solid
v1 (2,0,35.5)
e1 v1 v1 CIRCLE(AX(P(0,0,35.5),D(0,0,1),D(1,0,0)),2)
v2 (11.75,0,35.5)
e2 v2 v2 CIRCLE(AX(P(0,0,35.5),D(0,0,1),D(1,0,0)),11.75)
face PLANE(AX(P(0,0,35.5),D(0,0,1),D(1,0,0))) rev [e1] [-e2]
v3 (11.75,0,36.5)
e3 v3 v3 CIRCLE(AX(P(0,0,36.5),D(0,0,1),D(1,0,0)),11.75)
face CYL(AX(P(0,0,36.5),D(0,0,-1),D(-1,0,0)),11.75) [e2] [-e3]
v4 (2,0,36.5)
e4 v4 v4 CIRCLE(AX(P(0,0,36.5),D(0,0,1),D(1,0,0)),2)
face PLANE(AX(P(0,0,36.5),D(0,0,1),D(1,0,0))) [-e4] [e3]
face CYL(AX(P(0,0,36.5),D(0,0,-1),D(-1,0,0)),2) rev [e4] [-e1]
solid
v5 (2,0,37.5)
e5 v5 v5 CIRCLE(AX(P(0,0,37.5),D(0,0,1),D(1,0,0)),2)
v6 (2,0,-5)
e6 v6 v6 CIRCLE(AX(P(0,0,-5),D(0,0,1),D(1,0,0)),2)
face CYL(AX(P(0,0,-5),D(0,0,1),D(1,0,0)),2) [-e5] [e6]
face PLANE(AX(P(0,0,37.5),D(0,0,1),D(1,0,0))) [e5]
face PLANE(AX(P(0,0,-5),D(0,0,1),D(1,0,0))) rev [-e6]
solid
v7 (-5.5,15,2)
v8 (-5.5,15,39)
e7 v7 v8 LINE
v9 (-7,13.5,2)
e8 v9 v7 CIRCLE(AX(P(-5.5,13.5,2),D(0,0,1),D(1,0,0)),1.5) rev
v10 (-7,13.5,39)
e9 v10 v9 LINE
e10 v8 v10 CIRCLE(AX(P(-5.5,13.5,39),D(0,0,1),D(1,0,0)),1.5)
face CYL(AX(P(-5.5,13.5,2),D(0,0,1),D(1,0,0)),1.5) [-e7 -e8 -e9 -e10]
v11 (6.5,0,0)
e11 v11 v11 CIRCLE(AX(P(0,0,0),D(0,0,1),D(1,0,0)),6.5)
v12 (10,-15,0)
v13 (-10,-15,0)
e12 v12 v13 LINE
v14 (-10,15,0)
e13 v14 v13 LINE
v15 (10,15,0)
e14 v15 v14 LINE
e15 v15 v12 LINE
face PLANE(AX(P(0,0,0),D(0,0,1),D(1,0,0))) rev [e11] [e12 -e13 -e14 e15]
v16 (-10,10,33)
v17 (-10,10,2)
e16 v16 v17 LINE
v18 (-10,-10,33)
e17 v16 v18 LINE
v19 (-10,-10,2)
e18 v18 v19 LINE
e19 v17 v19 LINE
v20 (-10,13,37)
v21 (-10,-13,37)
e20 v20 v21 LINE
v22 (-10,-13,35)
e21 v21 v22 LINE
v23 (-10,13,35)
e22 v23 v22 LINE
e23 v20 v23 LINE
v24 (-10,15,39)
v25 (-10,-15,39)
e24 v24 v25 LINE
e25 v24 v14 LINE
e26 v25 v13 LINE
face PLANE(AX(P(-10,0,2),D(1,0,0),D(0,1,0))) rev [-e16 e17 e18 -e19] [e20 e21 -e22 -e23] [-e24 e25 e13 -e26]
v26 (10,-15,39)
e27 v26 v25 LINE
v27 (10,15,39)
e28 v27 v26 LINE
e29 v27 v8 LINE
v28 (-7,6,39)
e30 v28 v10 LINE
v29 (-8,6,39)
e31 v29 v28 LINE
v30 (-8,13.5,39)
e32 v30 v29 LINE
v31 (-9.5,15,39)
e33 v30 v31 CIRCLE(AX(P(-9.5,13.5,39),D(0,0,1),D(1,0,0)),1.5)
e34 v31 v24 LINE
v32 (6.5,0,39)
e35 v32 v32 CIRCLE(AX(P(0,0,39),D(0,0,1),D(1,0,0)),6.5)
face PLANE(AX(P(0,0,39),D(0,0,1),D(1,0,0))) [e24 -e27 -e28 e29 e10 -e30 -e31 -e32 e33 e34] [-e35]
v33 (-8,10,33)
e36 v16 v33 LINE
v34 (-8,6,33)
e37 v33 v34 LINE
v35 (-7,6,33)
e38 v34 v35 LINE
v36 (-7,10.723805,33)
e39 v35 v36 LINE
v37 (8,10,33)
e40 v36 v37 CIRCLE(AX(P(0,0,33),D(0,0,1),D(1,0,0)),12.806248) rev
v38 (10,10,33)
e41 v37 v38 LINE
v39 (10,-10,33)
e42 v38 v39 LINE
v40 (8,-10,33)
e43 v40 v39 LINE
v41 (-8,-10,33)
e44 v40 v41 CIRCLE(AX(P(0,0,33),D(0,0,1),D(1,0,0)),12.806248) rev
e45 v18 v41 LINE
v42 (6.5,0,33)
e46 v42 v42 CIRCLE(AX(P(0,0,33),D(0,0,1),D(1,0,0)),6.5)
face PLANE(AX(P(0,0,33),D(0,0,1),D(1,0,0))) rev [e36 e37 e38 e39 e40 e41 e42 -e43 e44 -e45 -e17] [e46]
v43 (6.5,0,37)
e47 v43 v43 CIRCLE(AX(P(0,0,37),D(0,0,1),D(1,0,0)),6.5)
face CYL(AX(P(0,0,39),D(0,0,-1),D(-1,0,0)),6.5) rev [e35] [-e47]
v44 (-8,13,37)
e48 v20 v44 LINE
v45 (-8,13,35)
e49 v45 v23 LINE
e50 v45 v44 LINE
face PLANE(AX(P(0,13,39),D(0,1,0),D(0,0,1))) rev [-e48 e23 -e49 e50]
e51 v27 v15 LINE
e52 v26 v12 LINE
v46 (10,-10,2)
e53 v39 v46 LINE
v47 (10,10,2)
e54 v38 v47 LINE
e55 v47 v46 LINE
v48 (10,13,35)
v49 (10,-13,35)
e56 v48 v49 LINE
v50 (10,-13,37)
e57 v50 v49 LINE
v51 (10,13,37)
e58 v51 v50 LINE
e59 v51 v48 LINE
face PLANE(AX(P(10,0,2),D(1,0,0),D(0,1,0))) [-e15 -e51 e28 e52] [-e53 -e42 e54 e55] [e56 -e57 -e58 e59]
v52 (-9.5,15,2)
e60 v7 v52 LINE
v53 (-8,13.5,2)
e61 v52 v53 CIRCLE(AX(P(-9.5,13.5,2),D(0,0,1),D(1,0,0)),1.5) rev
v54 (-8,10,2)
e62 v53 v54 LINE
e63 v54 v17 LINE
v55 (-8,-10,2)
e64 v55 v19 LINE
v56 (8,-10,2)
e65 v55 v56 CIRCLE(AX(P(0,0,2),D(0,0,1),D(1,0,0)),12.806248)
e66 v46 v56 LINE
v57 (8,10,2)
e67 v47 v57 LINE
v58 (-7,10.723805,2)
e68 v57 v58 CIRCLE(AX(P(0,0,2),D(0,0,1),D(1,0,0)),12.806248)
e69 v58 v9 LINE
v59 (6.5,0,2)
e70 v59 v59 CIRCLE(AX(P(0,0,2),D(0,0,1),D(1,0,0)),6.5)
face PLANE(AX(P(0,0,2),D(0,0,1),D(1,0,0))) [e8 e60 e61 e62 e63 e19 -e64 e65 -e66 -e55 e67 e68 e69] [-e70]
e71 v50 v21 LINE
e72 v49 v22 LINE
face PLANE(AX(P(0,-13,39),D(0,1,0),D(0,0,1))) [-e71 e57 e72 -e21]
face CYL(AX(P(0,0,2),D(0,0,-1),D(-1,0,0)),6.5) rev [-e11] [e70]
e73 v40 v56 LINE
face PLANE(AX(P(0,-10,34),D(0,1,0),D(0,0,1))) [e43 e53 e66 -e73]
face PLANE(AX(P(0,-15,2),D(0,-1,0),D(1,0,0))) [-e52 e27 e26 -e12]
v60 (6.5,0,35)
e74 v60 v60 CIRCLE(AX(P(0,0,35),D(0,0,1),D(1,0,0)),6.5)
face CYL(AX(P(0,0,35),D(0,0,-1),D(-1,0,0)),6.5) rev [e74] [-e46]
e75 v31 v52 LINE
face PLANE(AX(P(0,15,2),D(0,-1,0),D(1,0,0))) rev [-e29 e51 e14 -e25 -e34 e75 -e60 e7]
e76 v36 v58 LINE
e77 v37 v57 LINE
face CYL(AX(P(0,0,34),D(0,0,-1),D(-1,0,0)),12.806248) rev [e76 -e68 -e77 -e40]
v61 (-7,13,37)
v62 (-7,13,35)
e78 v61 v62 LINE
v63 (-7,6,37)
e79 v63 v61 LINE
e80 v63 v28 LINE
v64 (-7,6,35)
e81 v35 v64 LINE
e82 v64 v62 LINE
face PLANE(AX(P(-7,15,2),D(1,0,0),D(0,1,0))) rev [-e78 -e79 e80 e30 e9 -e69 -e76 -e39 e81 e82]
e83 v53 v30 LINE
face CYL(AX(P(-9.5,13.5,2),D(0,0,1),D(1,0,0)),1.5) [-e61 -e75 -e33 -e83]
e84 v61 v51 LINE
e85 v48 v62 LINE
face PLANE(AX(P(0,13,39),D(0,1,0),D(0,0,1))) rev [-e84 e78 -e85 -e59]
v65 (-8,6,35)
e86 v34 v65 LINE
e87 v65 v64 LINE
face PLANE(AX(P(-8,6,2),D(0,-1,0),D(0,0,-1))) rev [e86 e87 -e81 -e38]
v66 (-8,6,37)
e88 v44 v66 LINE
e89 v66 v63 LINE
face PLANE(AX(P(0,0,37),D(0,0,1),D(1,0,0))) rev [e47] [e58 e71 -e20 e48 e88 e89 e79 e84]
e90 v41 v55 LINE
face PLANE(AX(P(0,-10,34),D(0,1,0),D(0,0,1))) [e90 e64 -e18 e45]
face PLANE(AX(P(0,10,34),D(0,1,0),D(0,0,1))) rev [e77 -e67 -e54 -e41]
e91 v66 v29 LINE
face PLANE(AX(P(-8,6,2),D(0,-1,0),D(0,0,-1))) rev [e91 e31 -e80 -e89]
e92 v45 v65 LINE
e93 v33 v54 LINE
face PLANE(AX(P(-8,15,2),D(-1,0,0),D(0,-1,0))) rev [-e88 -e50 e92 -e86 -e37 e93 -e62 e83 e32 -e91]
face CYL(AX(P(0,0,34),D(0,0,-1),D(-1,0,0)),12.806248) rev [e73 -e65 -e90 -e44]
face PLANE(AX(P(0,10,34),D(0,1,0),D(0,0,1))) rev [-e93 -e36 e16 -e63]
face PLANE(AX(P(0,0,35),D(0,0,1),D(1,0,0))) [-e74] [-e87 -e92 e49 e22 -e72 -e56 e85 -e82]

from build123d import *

# Parameters (mm, degrees)
SKETCH1_W               = 20
SKETCH1_H               = 30
SKETCH1_R               = 6.5
BOSS_EXTRUDE1_DEPTH     = 2
BOSS_EXTRUDE4_DEPTH     = 34
BOSS_EXTRUDE5_START     = 37
SKETCH1_9_W             = 20
SKETCH1_9_H             = 30
SKETCH1_9_R             = 6.5
BOSS_EXTRUDE5_DEPTH     = 2
BOSS_EXTRUDE6_START     = 33
BOSS_EXTRUDE6_OUTLINE_W = 20
BOSS_EXTRUDE6_OUTLINE_H = 30
BOSS_EXTRUDE6_OUTLINE_R = 6.5
BOSS_EXTRUDE6_DEPTH     = 2
BOSS_EXTRUDE7_DEPTH     = 39
SKETCH2_W               = 1
SKETCH2_H               = 9
CUT_EXTRUDE1_DEPTH      = 37
FILLET2_R               = 1.5
BOSS_EXTRUDE8_START     = 35.5
SKETCH4_R               = 11.75
SKETCH4_R_2             = 2
BOSS_EXTRUDE8_DEPTH     = 1
BOSS_EXTRUDE9_START     = -5
BOSS_EXTRUDE9_OUTLINE_R = 2
BOSS_EXTRUDE9_DEPTH     = 42.5


# Read off the part's stored shape, not the designer's step: Boss-Extrude6, Boss-Extrude9
with BuildPart() as part:
    # Sketch1 → Boss-Extrude1 (new body)
    with BuildSketch(Plane.XY):
        Rectangle(SKETCH1_W, SKETCH1_H)
        Circle(SKETCH1_R, mode=Mode.SUBTRACT)
    extrude(amount=BOSS_EXTRUDE1_DEPTH)

    # Sketch1<7> → Boss-Extrude4 (add)
    with BuildSketch(Plane.XY):
        with BuildLine():
            Line((10, 15), (-10, 15))
            Line((-10, 15), (-10, 10))
            Line((-10, 10), (-8, 10))
            ThreePointArc((-8, 10), (0, 12.806248475), (8, 10))
            Line((8, 10), (10, 10))
            Line((10, 10), (10, 15))
        make_face()
        with BuildLine():
            Line((10, -10), (8, -10))
            ThreePointArc((8, -10), (0, -12.806248475), (-8, -10))
            Line((-8, -10), (-10, -10))
            Line((-10, -10), (-10, -15))
            Line((-10, -15), (10, -15))
            Line((10, -15), (10, -10))
        make_face()
    extrude(amount=BOSS_EXTRUDE4_DEPTH)

    # Boss-Extrude6 outline → Boss-Extrude6 (add)
    with BuildSketch(Plane.XY.offset(BOSS_EXTRUDE6_START)):
        Rectangle(BOSS_EXTRUDE6_OUTLINE_W, BOSS_EXTRUDE6_OUTLINE_H)
        Circle(BOSS_EXTRUDE6_OUTLINE_R, mode=Mode.SUBTRACT)
    extrude(amount=BOSS_EXTRUDE6_DEPTH)



with BuildPart() as body_2:
    # Sketch1<9> → Boss-Extrude5 (new body)
    with BuildSketch(Plane.XY.offset(BOSS_EXTRUDE5_START)):
        Rectangle(SKETCH1_9_W, SKETCH1_9_H)
        Circle(SKETCH1_9_R, mode=Mode.SUBTRACT)
    extrude(amount=BOSS_EXTRUDE5_DEPTH)


with BuildPart() as part_1:
    add(part.part)

    add(body_2.part)  # Boss-Extrude7 merges body 2
    # Sketch1<11> → Boss-Extrude7 (add)
    with BuildSketch(Plane.XY):
        Polygon((10, 13), (10, 15), (-10, 15), (-10, 13), (-8, 13), (8, 13), align=None)
        Polygon((10, -15), (10, -13), (8, -13), (-8, -13), (-10, -13), (-10, -15), align=None)
    extrude(amount=BOSS_EXTRUDE7_DEPTH)

    # Sketch2 → Cut-Extrude1 (cut)
    with BuildSketch(Plane.XY.offset(39)):
        with Locations((-7.5, 10.5)):
            Rectangle(SKETCH2_W, SKETCH2_H)
    extrude(amount=-CUT_EXTRUDE1_DEPTH, mode=Mode.SUBTRACT)

    # Fillet2
    fillet2_edges = [part_1.edges().sort_by_distance(p)[0] for p in [
        (-7, 15, 20.5),
        (-8, 15, 20.5),
    ]]
    fillet(fillet2_edges, radius=FILLET2_R)


with BuildPart() as body_2_2:
    # Sketch4 → Boss-Extrude8 (new body)
    with BuildSketch(Plane.XY.offset(BOSS_EXTRUDE8_START)):
        Circle(SKETCH4_R)
        Circle(SKETCH4_R_2, mode=Mode.SUBTRACT)
    extrude(amount=BOSS_EXTRUDE8_DEPTH)


with BuildPart() as body_3:
    # Boss-Extrude9 outline → Boss-Extrude9 (new body)
    with BuildSketch(Plane.XY.offset(BOSS_EXTRUDE9_START)):
        Circle(BOSS_EXTRUDE9_OUTLINE_R)
    extrude(amount=BOSS_EXTRUDE9_DEPTH)


solid = Compound([part_1.part, body_2_2.part, body_3.part])
